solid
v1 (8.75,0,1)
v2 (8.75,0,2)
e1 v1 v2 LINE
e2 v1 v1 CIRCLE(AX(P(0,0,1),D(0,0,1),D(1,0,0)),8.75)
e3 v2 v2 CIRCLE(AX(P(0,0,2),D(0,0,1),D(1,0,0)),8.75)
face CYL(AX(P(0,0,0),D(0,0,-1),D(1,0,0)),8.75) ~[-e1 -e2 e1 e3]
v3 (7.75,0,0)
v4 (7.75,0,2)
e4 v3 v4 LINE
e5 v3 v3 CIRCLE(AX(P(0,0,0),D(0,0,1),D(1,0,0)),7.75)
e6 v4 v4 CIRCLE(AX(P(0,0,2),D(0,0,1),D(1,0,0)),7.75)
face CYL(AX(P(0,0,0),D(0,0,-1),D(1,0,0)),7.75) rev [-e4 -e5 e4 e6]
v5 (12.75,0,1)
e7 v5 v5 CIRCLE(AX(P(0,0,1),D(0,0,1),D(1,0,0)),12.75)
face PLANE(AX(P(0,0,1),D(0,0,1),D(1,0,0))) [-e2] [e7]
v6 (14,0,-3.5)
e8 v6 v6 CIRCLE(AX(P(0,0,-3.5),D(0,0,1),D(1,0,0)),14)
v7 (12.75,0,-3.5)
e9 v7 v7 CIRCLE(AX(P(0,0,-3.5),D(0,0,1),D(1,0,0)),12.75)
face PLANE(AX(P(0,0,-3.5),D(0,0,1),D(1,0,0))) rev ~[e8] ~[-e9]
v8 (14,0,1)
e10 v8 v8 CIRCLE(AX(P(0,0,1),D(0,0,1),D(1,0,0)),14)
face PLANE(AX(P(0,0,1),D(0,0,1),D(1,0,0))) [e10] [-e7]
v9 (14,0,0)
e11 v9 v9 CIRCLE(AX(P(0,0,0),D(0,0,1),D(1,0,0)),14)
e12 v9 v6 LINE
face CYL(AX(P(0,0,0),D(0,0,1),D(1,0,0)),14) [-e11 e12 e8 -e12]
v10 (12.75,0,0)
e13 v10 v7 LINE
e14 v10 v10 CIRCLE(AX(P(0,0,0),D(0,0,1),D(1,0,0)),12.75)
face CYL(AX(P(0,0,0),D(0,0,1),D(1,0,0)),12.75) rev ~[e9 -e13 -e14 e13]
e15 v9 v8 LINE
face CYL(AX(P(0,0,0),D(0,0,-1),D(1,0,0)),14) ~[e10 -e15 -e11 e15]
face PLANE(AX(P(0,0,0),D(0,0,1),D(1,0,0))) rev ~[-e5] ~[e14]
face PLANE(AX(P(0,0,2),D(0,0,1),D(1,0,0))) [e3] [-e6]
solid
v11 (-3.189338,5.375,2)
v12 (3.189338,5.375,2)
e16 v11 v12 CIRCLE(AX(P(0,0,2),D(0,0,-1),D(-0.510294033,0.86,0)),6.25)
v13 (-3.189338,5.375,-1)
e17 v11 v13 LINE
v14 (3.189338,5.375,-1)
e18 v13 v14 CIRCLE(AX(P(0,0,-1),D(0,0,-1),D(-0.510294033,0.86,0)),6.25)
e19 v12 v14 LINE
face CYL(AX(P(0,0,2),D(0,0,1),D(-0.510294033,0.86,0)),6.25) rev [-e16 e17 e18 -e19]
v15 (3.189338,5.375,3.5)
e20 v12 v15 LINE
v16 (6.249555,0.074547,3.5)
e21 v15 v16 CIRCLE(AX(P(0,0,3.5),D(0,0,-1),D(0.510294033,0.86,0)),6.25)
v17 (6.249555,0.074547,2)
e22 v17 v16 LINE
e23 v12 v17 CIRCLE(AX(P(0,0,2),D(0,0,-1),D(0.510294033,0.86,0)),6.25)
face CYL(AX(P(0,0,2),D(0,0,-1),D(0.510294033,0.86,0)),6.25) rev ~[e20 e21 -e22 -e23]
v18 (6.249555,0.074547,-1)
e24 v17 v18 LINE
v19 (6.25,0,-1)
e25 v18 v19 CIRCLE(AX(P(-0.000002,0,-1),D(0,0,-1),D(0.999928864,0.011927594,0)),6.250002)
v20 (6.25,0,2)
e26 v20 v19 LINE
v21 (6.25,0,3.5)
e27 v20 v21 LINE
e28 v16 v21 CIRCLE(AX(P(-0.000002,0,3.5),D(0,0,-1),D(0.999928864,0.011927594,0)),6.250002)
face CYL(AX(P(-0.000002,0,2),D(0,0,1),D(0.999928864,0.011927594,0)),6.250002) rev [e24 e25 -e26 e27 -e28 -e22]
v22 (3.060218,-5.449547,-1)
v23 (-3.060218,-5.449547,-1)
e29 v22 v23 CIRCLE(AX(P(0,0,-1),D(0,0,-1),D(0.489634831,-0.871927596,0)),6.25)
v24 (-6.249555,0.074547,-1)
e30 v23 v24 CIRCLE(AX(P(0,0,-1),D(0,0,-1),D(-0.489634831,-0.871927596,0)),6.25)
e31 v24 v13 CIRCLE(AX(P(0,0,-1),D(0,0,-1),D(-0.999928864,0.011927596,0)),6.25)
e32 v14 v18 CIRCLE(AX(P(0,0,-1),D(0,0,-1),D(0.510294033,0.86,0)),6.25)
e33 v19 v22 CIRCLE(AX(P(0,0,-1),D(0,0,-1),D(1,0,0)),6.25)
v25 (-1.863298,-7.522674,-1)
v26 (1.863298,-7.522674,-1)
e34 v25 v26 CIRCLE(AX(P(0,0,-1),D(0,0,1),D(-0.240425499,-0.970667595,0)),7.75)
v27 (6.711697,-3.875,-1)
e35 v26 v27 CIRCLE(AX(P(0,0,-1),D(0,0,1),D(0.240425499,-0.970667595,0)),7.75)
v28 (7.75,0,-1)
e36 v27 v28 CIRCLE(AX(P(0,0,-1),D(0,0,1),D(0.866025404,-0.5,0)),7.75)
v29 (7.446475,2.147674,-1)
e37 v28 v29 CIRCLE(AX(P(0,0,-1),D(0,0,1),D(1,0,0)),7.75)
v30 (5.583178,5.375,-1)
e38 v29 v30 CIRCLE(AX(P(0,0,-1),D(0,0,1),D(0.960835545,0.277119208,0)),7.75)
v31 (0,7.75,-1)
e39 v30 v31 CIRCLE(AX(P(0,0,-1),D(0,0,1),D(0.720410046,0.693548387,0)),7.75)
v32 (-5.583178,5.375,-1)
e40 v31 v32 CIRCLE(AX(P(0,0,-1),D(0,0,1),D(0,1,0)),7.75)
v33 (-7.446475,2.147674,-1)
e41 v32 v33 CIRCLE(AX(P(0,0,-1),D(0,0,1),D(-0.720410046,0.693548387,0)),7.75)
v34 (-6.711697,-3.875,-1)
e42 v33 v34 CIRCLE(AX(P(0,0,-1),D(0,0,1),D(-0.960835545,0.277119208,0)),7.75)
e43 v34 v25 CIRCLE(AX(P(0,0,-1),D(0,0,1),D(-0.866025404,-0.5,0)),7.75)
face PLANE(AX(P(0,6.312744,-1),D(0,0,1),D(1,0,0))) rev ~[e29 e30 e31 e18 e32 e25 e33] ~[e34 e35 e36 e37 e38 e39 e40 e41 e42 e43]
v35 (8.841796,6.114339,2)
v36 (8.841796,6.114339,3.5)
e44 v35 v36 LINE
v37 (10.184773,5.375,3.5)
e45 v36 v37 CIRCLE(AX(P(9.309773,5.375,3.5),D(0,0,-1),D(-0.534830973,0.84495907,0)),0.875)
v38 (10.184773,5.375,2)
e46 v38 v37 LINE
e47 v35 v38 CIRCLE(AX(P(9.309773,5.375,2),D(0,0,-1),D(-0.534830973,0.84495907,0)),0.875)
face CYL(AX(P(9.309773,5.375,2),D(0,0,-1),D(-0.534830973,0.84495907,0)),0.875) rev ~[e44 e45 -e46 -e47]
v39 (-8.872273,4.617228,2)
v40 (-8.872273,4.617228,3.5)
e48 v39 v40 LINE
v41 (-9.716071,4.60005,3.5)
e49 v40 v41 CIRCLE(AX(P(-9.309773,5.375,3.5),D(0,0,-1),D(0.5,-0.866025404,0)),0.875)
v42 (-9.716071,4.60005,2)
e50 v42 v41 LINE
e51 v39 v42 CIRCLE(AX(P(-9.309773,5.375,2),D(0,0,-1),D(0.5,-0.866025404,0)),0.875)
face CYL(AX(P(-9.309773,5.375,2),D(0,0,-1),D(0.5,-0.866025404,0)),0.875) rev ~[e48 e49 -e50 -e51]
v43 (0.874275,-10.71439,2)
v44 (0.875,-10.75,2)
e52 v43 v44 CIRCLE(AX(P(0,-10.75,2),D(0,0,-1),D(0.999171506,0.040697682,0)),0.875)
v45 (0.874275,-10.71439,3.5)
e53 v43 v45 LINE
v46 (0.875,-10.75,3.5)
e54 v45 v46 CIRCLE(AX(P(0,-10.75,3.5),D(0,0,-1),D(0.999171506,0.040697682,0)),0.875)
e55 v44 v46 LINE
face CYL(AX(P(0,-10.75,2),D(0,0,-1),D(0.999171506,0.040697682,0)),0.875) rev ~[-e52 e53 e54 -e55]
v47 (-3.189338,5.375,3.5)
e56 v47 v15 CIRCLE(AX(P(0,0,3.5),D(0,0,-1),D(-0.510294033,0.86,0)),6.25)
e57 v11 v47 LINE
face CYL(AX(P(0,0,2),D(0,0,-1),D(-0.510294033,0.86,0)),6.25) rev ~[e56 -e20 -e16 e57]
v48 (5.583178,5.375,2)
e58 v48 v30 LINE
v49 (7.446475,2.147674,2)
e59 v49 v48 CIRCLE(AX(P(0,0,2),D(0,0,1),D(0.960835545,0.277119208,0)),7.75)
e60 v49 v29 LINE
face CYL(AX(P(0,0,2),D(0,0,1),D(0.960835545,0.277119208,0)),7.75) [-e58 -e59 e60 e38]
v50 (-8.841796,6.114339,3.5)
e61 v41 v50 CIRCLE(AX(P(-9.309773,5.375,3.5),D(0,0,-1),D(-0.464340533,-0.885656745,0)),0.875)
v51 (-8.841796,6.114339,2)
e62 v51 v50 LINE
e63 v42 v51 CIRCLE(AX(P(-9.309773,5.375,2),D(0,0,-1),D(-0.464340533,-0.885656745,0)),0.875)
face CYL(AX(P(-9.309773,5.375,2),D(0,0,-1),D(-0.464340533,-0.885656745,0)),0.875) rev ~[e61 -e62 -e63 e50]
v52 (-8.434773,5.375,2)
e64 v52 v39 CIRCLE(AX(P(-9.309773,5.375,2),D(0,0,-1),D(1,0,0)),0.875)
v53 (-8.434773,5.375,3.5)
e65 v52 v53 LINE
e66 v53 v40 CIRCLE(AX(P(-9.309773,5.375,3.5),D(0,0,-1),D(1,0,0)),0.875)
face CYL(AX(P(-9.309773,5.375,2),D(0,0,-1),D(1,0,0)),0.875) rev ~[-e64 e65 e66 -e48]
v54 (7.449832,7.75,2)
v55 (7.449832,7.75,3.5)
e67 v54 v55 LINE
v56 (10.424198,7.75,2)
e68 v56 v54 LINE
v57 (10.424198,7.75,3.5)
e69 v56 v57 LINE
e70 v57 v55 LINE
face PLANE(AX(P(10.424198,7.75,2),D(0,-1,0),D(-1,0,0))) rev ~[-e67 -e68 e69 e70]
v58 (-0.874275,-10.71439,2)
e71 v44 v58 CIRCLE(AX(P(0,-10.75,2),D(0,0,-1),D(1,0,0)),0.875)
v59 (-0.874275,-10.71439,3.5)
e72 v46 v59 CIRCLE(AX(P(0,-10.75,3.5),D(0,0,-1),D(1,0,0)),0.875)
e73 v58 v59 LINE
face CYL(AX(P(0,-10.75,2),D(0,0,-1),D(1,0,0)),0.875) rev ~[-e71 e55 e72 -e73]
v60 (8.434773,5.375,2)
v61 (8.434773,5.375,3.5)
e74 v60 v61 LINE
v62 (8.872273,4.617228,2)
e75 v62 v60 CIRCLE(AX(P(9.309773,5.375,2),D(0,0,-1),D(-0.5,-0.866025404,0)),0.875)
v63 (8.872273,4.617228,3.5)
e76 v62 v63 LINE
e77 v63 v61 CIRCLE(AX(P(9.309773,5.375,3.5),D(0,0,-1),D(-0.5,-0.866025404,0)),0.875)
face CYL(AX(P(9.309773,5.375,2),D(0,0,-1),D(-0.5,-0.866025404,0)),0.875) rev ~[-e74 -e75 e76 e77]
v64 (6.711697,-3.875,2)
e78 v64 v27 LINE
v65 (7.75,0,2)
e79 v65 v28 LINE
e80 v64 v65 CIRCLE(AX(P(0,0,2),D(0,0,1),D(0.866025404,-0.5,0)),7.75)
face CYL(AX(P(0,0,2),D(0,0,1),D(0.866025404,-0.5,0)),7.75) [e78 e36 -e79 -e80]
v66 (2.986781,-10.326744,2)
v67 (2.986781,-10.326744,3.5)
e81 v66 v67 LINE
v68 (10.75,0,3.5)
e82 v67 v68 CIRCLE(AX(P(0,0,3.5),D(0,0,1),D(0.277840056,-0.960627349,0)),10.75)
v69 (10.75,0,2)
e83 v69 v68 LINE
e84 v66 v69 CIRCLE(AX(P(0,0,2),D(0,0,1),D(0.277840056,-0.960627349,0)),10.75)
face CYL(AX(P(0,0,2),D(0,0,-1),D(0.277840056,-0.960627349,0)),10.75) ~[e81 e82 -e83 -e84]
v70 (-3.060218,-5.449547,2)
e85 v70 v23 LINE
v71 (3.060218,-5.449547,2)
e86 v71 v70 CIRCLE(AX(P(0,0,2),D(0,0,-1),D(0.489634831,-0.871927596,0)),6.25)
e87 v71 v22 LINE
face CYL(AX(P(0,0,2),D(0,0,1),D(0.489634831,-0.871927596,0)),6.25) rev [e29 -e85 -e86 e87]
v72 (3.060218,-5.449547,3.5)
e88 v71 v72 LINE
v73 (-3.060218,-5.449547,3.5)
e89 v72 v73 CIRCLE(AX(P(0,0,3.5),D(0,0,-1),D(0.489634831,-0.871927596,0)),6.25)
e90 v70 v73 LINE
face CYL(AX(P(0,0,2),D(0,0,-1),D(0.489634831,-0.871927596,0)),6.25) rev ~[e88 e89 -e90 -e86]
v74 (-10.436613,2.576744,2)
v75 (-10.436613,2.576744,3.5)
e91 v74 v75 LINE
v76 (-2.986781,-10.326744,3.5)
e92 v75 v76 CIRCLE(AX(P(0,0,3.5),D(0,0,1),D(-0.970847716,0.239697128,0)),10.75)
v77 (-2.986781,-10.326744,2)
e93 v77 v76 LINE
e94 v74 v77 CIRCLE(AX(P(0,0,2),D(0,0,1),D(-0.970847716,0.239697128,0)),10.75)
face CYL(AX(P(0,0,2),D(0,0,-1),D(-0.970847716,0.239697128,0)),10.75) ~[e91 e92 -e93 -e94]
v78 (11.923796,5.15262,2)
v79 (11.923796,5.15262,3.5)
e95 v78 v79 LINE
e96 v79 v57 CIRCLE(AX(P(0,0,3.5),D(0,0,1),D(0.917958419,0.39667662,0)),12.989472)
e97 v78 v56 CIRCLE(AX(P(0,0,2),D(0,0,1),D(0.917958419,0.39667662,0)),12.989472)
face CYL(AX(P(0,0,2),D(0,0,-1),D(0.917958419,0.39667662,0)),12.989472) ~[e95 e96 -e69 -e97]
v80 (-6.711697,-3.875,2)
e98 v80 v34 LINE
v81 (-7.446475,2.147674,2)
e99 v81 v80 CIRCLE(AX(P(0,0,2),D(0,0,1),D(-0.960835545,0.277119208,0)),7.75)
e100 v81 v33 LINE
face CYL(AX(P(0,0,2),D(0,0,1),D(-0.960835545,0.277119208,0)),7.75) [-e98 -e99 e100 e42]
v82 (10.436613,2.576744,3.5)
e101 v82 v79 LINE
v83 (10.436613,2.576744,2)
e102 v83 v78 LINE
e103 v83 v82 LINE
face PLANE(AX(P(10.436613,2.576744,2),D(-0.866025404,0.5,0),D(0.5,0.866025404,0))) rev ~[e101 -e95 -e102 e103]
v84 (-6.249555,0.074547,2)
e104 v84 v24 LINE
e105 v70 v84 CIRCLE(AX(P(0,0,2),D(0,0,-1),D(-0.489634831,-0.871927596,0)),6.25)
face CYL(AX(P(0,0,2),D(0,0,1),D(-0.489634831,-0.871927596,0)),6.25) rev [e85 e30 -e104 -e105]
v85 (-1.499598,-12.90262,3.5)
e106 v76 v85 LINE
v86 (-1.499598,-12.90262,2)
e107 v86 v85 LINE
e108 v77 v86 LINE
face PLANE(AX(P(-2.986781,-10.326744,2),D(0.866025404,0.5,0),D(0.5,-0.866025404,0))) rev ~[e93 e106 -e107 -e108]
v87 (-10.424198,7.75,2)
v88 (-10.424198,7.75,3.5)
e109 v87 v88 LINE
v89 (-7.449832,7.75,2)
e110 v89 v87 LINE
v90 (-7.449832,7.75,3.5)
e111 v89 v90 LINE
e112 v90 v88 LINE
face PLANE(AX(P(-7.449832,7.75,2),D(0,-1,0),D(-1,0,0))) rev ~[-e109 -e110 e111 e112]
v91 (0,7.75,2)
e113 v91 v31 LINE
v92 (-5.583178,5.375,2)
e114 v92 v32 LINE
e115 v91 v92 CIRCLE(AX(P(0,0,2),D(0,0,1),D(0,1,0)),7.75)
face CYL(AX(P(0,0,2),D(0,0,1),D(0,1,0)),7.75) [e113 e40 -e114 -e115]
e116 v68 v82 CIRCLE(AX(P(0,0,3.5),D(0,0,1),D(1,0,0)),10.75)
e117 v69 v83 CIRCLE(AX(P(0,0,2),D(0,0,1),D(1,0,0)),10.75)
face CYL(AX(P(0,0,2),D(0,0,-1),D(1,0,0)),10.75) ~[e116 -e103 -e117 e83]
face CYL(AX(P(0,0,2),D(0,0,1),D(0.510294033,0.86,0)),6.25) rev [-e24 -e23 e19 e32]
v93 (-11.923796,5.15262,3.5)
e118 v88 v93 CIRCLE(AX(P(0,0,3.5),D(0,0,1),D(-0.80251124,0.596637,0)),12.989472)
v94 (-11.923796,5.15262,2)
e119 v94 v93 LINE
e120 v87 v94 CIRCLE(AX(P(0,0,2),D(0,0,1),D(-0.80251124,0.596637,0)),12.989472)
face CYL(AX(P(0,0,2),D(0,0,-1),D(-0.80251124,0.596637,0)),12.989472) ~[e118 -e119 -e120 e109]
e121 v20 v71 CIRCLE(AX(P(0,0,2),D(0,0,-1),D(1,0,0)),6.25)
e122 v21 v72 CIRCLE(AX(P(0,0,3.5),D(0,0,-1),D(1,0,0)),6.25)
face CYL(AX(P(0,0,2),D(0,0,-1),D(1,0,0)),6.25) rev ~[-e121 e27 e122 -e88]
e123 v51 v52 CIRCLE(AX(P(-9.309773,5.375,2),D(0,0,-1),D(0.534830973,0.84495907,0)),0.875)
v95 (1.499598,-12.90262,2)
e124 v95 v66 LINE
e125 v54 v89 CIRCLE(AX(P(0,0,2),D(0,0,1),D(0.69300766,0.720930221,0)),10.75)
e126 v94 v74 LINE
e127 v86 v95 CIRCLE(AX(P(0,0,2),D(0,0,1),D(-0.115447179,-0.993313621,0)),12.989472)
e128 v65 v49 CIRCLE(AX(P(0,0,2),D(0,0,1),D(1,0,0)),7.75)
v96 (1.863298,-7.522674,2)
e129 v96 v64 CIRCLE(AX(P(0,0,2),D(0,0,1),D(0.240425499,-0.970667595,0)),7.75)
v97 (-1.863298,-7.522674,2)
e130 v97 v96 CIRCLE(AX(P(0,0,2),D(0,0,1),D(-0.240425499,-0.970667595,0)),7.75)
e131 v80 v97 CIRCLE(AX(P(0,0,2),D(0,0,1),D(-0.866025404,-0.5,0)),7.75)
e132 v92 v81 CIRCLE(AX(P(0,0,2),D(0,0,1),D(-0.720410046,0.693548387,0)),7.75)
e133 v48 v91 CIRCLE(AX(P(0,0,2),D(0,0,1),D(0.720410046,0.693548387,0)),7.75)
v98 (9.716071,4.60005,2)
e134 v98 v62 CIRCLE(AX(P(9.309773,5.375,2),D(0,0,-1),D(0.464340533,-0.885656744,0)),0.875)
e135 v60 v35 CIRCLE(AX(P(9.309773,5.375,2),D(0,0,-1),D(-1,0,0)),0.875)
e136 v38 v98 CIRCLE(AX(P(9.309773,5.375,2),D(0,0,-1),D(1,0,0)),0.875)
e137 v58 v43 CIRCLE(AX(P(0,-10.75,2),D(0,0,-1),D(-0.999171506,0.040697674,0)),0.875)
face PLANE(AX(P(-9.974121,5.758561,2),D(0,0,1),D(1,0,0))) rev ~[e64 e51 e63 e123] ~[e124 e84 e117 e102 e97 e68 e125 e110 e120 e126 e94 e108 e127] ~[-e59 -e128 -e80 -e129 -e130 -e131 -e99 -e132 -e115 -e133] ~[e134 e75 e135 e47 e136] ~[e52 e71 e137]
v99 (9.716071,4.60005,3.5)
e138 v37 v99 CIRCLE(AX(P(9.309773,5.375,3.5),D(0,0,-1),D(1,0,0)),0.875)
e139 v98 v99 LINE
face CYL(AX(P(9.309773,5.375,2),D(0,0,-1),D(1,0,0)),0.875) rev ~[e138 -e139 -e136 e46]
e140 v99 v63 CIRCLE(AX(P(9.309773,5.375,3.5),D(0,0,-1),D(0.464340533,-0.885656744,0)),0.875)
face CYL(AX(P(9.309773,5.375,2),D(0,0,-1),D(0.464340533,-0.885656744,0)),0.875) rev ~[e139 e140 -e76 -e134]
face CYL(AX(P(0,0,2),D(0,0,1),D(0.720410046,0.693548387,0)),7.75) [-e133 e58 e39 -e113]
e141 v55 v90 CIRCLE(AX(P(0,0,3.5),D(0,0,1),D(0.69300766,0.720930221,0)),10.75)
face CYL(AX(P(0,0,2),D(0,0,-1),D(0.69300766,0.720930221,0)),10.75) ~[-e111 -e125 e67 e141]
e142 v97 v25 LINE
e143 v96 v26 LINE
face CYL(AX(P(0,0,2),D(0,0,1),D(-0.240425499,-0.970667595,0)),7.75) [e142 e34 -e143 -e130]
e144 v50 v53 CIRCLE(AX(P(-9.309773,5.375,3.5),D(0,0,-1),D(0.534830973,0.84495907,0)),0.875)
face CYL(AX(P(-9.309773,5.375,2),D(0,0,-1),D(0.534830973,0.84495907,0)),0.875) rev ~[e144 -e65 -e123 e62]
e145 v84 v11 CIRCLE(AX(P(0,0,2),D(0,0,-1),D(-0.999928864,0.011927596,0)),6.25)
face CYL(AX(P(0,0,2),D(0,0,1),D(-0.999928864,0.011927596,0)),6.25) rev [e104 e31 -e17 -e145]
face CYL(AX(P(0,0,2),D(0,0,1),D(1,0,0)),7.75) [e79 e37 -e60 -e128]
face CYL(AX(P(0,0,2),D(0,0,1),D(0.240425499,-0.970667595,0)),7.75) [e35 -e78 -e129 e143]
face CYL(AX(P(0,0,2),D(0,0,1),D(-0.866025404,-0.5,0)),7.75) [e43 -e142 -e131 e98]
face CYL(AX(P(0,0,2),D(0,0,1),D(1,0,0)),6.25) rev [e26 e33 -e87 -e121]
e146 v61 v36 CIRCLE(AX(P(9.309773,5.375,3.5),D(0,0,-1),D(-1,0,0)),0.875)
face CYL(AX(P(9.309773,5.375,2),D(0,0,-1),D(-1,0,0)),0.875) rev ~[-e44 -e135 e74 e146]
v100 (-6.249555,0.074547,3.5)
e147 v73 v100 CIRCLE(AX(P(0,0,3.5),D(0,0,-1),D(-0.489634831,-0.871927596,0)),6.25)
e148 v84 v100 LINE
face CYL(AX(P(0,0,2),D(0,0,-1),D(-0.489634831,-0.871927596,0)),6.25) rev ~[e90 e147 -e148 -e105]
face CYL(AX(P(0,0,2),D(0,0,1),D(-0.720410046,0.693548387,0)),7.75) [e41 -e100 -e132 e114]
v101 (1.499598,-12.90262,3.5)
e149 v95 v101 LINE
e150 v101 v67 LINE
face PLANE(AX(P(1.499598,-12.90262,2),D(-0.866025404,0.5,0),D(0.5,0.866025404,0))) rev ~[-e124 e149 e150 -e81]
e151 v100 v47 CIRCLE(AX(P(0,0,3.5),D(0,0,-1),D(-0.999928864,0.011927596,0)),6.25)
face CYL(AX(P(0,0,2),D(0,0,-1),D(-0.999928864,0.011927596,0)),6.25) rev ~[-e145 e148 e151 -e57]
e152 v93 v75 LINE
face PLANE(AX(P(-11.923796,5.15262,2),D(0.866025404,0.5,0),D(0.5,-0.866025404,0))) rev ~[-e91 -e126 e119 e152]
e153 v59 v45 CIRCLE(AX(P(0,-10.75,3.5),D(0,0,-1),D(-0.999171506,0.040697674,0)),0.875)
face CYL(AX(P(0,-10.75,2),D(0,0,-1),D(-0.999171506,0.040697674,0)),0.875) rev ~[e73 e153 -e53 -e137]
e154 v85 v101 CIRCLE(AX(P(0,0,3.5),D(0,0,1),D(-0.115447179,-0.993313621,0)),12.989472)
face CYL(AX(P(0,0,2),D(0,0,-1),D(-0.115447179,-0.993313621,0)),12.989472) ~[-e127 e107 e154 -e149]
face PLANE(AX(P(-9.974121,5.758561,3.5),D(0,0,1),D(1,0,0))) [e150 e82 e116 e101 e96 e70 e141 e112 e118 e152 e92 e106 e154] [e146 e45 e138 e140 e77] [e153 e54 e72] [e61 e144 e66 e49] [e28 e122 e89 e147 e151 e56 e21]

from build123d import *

# Parameters (mm, degrees)
F0_R          = 8.75
F0_R_2        = 7.75
F1_DEPTH      = 2
F0_R_3        = 12.75
F2_DEPTH      = 1
F0_R_4        = 14
F3_DEPTH      = 3.5
F3_DEPTH_BACK = 1
F5_DEPTH      = 1.5
F6_DEPTH      = 3


# Not quite as in the source:
# - ends of sketch curves that miss each other by under 0.0002 mm in the source are joined


with BuildPart() as f1:
    # F0 (on Top) → F1 (new body)
    with BuildSketch(Plane.XY):
        Circle(F0_R)
        Circle(F0_R_2, mode=Mode.SUBTRACT)
    extrude(amount=F1_DEPTH)

    # F0 (on Top) → F2 (join)
    with BuildSketch(Plane.XY):
        Circle(F0_R_3)
        Circle(F0_R, mode=Mode.SUBTRACT)
    extrude(amount=F2_DEPTH)

    # F0 (on Top) → F3 (join, two sides)
    with BuildSketch(Plane.XY) as f3_sk:
        Circle(F0_R_4)
        Circle(F0_R_3, mode=Mode.SUBTRACT)
    extrude(amount=-F3_DEPTH)
    extrude(f3_sk.sketch, amount=F3_DEPTH_BACK)


with BuildPart() as f5:
    # F4 (on face) → F5 (new body)
    with BuildSketch(Plane.XY.offset(2)):
        with BuildLine():
            Line((-7.4498323446, 7.7499998733), (-10.4241976301, 7.7499998733))
            ThreePointArc((-10.4241976301, 7.7499998733), (-11.2492131147, 6.49473622), (-11.9237955847, 5.1526200251))
            Line((-11.9237955847, 5.1526200251), (-10.436612942, 2.5767441277))
            ThreePointArc((-10.436612942, 2.5767441277), (-10.1269990673, 3.606437285), (-9.7160710573, 4.6000503485))
            ThreePointArc((-9.7160710573, 4.6000503485), (-10.067545319, 5.8125), (-8.8417959892, 6.1143391863))
            ThreePointArc((-8.8417959892, 6.1143391863), (-8.1867658396, 6.9670198139), (-7.4498323446, 7.7499998733))
        make_face()
        with BuildLine():
            Line((1.4995979546, -12.9026198984), (2.9867805973, -10.3267440011))
            ThreePointArc((2.9867805973, -10.3267440011), (1.9402332277, -10.5734570989), (0.8742750681, -10.7143895349))
            ThreePointArc((0.8742750681, -10.7143895349), (0.8748187483, -10.7321910784), (0.875, -10.75))
            ThreePointArc((0.875, -10.75), (-0.0178089216, -11.6248187483), (-0.8742750681, -10.7143895349))
            ThreePointArc((-0.8742750681, -10.7143895349), (-1.9402332277, -10.5734570989), (-2.9867805973, -10.3267440011))
            Line((-2.9867805973, -10.3267440011), (-1.4995979546, -12.9026198984))
            ThreePointArc((-1.4995979546, -12.9026198984), (0, -12.9894724399), (1.4995979546, -12.9026198984))
        make_face()
        with BuildLine():
            ThreePointArc((9.7160710573, 4.6000503485), (10.1269990673, 3.606437285), (10.436612942, 2.5767441277))
            Line((10.436612942, 2.5767441277), (11.9237955847, 5.1526200251))
            ThreePointArc((11.9237955847, 5.1526200251), (11.2492131147, 6.49473622), (10.4241976301, 7.7499998733))
            Line((10.4241976301, 7.7499998733), (7.4498323446, 7.7499998733))
            ThreePointArc((7.4498323446, 7.7499998733), (8.1867658396, 6.9670198139), (8.8417959892, 6.1143391863))
            ThreePointArc((8.8417959892, 6.1143391863), (9.7317594863, 6.1415197205), (10.1847730907, 5.375))
            ThreePointArc((10.1847730907, 5.375), (10.0584838896, 4.9221676474), (9.7160710573, 4.6000503485))
        make_face()
        with BuildLine():
            Line((4.062019444, 7.7499998733), (7.4498323446, 7.7499998733))
            ThreePointArc((7.4498323446, 7.7499998733), (0, 10.75), (-7.4498323446, 7.7499998733))
            Line((-7.4498323446, 7.7499998733), (-4.062019444, 7.7499998733))
            ThreePointArc((-4.062019444, 7.7499998733), (0, 8.75), (4.062019444, 7.7499998733))
        make_face()
        with BuildLine():
            Line((-4.062019444, 7.7499998733), (-7.4498323446, 7.7499998733))
            ThreePointArc((-7.4498323446, 7.7499998733), (-8.1867658396, 6.9670198139), (-8.8417959892, 6.1143391863))
            ThreePointArc((-8.8417959892, 6.1143391863), (-8.5432533702, 5.7969863956), (-8.4347730907, 5.375))
            Line((-8.4347730907, 5.375), (-6.9044822398, 5.375))
            ThreePointArc((-6.9044822398, 5.375), (-5.6103650411, 6.7146335794), (-4.062019444, 7.7499998733))
        make_face()
        with BuildLine():
            Line((-6.9044822398, 5.375), (-8.4347730907, 5.375))
            ThreePointArc((-8.4347730907, 5.375), (-8.5520008624, 4.9375), (-8.8722730907, 4.6172277717))
            Line((-8.8722730907, 4.6172277717), (-8.1071276653, 3.2919570197))
            ThreePointArc((-8.1071276653, 3.2919570197), (-7.5777222831, 4.375), (-6.9044822398, 5.375))
        make_face()
        with BuildLine():
            ThreePointArc((-9.7160710573, 4.6000503485), (-10.1269990673, 3.606437285), (-10.436612942, 2.5767441277))
            Line((-10.436612942, 2.5767441277), (-8.7427064916, -0.3571879075))
            ThreePointArc((-8.7427064916, -0.3571879075), (-8.6202257774, 1.5014018604), (-8.1071276653, 3.2919570197))
            Line((-8.1071276653, 3.2919570197), (-8.8722730907, 4.6172277717))
            ThreePointArc((-8.8722730907, 4.6172277717), (-9.2919641691, 4.5001812517), (-9.7160710573, 4.6000503485))
        make_face()
        with BuildLine():
            ThreePointArc((-10.436612942, 2.5767441277), (-9.3097730907, -5.375), (-2.9867805973, -10.3267440011))
            Line((-2.9867805973, -10.3267440011), (-4.6806870477, -7.3928119658))
            ThreePointArc((-4.6806870477, -7.3928119658), (-7.5777222831, -4.375), (-8.7427064916, -0.3571879075))
            Line((-8.7427064916, -0.3571879075), (-10.436612942, 2.5767441277))
        make_face()
        with BuildLine():
            ThreePointArc((-2.9867805973, -10.3267440011), (-1.9402332277, -10.5734570989), (-0.8742750681, -10.7143895349))
            ThreePointArc((-0.8742750681, -10.7143895349), (-0.7487107989, -10.2971676474), (-0.4375, -9.9922277717))
            Line((-0.4375, -9.9922277717), (-1.2026454254, -8.6669570197))
            ThreePointArc((-1.2026454254, -8.6669570197), (-3.0098607363, -8.2160354398), (-4.6806870477, -7.3928119658))
            Line((-4.6806870477, -7.3928119658), (-2.9867805973, -10.3267440011))
        make_face()
        with BuildLine():
            ThreePointArc((0.8742750681, -10.7143895349), (1.9402332277, -10.5734570989), (2.9867805973, -10.3267440011))
            Line((2.9867805973, -10.3267440011), (4.6806870477, -7.3928119658))
            ThreePointArc((4.6806870477, -7.3928119658), (3.0098607363, -8.2160354398), (1.2026454254, -8.6669570197))
            Line((1.2026454254, -8.6669570197), (0.4375, -9.9922277717))
            ThreePointArc((0.4375, -9.9922277717), (0.7487107989, -10.2971676474), (0.8742750681, -10.7143895349))
        make_face()
        with BuildLine():
            ThreePointArc((2.9867805973, -10.3267440011), (8.592740873, -6.4596675061), (10.75, 0))
            ThreePointArc((10.75, 0), (10.6713656372, 1.2978657238), (10.436612942, 2.5767441277))
            Line((10.436612942, 2.5767441277), (8.7427064916, -0.3571879075))
            ThreePointArc((8.7427064916, -0.3571879075), (7.5777222831, -4.375), (4.6806870477, -7.3928119658))
            Line((4.6806870477, -7.3928119658), (2.9867805973, -10.3267440011))
        make_face()
        with BuildLine():
            Line((8.7427064916, -0.3571879075), (10.436612942, 2.5767441277))
            ThreePointArc((10.436612942, 2.5767441277), (10.1269990673, 3.606437285), (9.7160710573, 4.6000503485))
            ThreePointArc((9.7160710573, 4.6000503485), (9.2919641691, 4.5001812517), (8.8722730907, 4.6172277717))
            Line((8.8722730907, 4.6172277717), (8.1071276653, 3.2919570197))
            ThreePointArc((8.1071276653, 3.2919570197), (8.5877781489, 1.6770707989), (8.75, 0))
            ThreePointArc((8.75, 0), (8.7481764329, -0.1786311819), (8.7427064916, -0.3571879075))
        make_face()
        with BuildLine():
            Line((8.1071276653, 3.2919570197), (8.8722730907, 4.6172277717))
            ThreePointArc((8.8722730907, 4.6172277717), (8.5520008624, 4.9375), (8.4347730907, 5.375))
            Line((8.4347730907, 5.375), (6.9044822398, 5.375))
            ThreePointArc((6.9044822398, 5.375), (7.5777222831, 4.375), (8.1071276653, 3.2919570197))
        make_face()
        with BuildLine():
            ThreePointArc((8.4347730907, 5.375), (8.5432533702, 5.7969863956), (8.8417959892, 6.1143391863))
            ThreePointArc((8.8417959892, 6.1143391863), (8.1867658396, 6.9670198139), (7.4498323446, 7.7499998733))
            Line((7.4498323446, 7.7499998733), (4.062019444, 7.7499998733))
            ThreePointArc((4.062019444, 7.7499998733), (5.6103650411, 6.7146335794), (6.9044822398, 5.375))
            Line((6.9044822398, 5.375), (8.4347730907, 5.375))
        make_face()
        with BuildLine():
            ThreePointArc((-0.4375, -9.9922277717), (0, -9.875), (0.4375, -9.9922277717))
            Line((0.4375, -9.9922277717), (1.2026454254, -8.6669570197))
            ThreePointArc((1.2026454254, -8.6669570197), (0, -8.75), (-1.2026454254, -8.6669570197))
            Line((-1.2026454254, -8.6669570197), (-0.4375, -9.9922277717))
        make_face()
        with BuildLine():
            Line((0, 7.7499998733), (4.062019444, 7.7499998733))
            ThreePointArc((4.062019444, 7.7499998733), (0, 8.75), (-4.062019444, 7.7499998733))
            Line((-4.062019444, 7.7499998733), (0, 7.7499998733))
        make_face()
        with BuildLine():
            Line((0, 7.7499998733), (-4.062019444, 7.7499998733))
            ThreePointArc((-4.062019444, 7.7499998733), (-5.6103650411, 6.7146335794), (-6.9044822398, 5.375))
            Line((-6.9044822398, 5.375), (-5.5831778585, 5.375))
            ThreePointArc((-5.5831778585, 5.375), (-3.0336652749, 7.1315759128), (0, 7.7499998733))
        make_face()
        with BuildLine():
            Line((-5.5831778585, 5.375), (-6.9044822398, 5.375))
            ThreePointArc((-6.9044822398, 5.375), (-7.5777222831, 4.375), (-8.1071276653, 3.2919570197))
            Line((-8.1071276653, 3.2919570197), (-7.4464754746, 2.1476738593))
            ThreePointArc((-7.4464754746, 2.1476738593), (-6.7116968793, 3.875), (-5.5831778585, 5.375))
        make_face()
        with BuildLine():
            Line((-8.7427064916, -0.3571879075), (-6.7116967696, -3.8749999367))
            ThreePointArc((-6.7116967696, -3.8749999367), (-7.6929585469, -0.9385567618), (-7.4464754746, 2.1476738593))
            Line((-7.4464754746, 2.1476738593), (-8.1071276653, 3.2919570197))
            ThreePointArc((-8.1071276653, 3.2919570197), (-8.6202257774, 1.5014018604), (-8.7427064916, -0.3571879075))
        make_face()
        with BuildLine():
            ThreePointArc((-8.7427064916, -0.3571879075), (-7.5777222831, -4.375), (-4.6806870477, -7.3928119658))
            Line((-4.6806870477, -7.3928119658), (-6.7116967696, -3.8749999367))
            Line((-6.7116967696, -3.8749999367), (-8.7427064916, -0.3571879075))
        make_face()
        with BuildLine():
            ThreePointArc((-4.6806870477, -7.3928119658), (-3.0098607363, -8.2160354398), (-1.2026454254, -8.6669570197))
            Line((-1.2026454254, -8.6669570197), (-1.8632976161, -7.5226738593))
            ThreePointArc((-1.8632976161, -7.5226738593), (-4.6592932721, -6.193019151), (-6.7116968793, -3.875))
            Line((-6.7116968793, -3.875), (-4.6806870477, -7.3928119658))
        make_face()
        with BuildLine():
            ThreePointArc((-1.2026454254, -8.6669570197), (0, -8.75), (1.2026454254, -8.6669570197))
            Line((1.2026454254, -8.6669570197), (1.8632976161, -7.5226738593))
            ThreePointArc((1.8632976161, -7.5226738593), (0, -7.75), (-1.8632976161, -7.5226738593))
            Line((-1.8632976161, -7.5226738593), (-1.2026454254, -8.6669570197))
        make_face()
        with BuildLine():
            ThreePointArc((1.2026454254, -8.6669570197), (3.0098607363, -8.2160354398), (4.6806870477, -7.3928119658))
            Line((4.6806870477, -7.3928119658), (6.7116967696, -3.8749999367))
            ThreePointArc((6.7116967696, -3.8749999367), (4.6592932721, -6.193019151), (1.8632976161, -7.5226738593))
            Line((1.8632976161, -7.5226738593), (1.2026454254, -8.6669570197))
        make_face()
        with BuildLine():
            ThreePointArc((4.6806870477, -7.3928119658), (7.5777222831, -4.375), (8.7427064916, -0.3571879075))
            Line((8.7427064916, -0.3571879075), (6.7116967696, -3.8749999367))
            Line((6.7116967696, -3.8749999367), (4.6806870477, -7.3928119658))
        make_face()
        with BuildLine():
            Line((6.7116967696, -3.8749999367), (8.7427064916, -0.3571879075))
            ThreePointArc((8.7427064916, -0.3571879075), (8.7481764329, -0.1786311819), (8.75, 0))
            ThreePointArc((8.75, 0), (8.5877781489, 1.6770707989), (8.1071276653, 3.2919570197))
            Line((8.1071276653, 3.2919570197), (7.4464754746, 2.1476738593))
            ThreePointArc((7.4464754746, 2.1476738593), (7.6737437059, 1.0845079695), (7.75, 0))
            ThreePointArc((7.75, 0), (7.4859251537, -2.0058475995), (6.7116967696, -3.8749999367))
        make_face()
        with BuildLine():
            Line((7.4464754746, 2.1476738593), (8.1071276653, 3.2919570197))
            ThreePointArc((8.1071276653, 3.2919570197), (7.5777222831, 4.375), (6.9044822398, 5.375))
            Line((6.9044822398, 5.375), (5.5831778585, 5.375))
            ThreePointArc((5.5831778585, 5.375), (6.7116968793, 3.875), (7.4464754746, 2.1476738593))
        make_face()
        with BuildLine():
            Line((5.5831778585, 5.375), (6.9044822398, 5.375))
            ThreePointArc((6.9044822398, 5.375), (5.6103650411, 6.7146335794), (4.062019444, 7.7499998733))
            Line((4.062019444, 7.7499998733), (0, 7.7499998733))
            ThreePointArc((0, 7.7499998733), (3.0336652749, 7.1315759128), (5.5831778585, 5.375))
        make_face()
        with BuildLine():
            Line((3.1893377055, 5.375), (5.5831778585, 5.375))
            ThreePointArc((5.5831778585, 5.375), (3.0336652749, 7.1315759128), (0, 7.75))
            ThreePointArc((0, 7.75), (-3.0336652749, 7.1315759128), (-5.5831778585, 5.375))
            Line((-5.5831778585, 5.375), (-3.1893377055, 5.375))
            ThreePointArc((-3.1893377055, 5.375), (0, 6.25), (3.1893377055, 5.375))
        make_face()
        with BuildLine():
            Line((-3.1893377055, 5.375), (-5.5831778585, 5.375))
            ThreePointArc((-5.5831778585, 5.375), (-6.7116968793, 3.875), (-7.4464754746, 2.1476738593))
            Line((-7.4464754746, 2.1476738593), (-6.2495553981, 0.0745474742))
            ThreePointArc((-6.2495553981, 0.0745474742), (-5.4126587737, 3.125), (-3.1893377055, 5.375))
        make_face()
        with BuildLine():
            ThreePointArc((-6.7116968793, -3.875), (-4.6592932721, -6.193019151), (-1.8632976161, -7.5226738593))
            Line((-1.8632976161, -7.5226738593), (-3.0602176926, -5.4495474742))
            ThreePointArc((-3.0602176926, -5.4495474742), (-5.4126587737, -3.125), (-6.2495553981, 0.0745474742))
            Line((-6.2495553981, 0.0745474742), (-7.4464754746, 2.1476738593))
            ThreePointArc((-7.4464754746, 2.1476738593), (-7.6929585469, -0.9385567618), (-6.7116968793, -3.875))
        make_face()
        with BuildLine():
            ThreePointArc((1.8632976161, -7.5226738593), (4.6592932721, -6.193019151), (6.7116968793, -3.875))
            ThreePointArc((6.7116968793, -3.875), (7.4859251537, -2.0058475995), (7.75, 0))
            ThreePointArc((7.75, 0), (7.6737437059, 1.0845079695), (7.4464754746, 2.1476738593))
            Line((7.4464754746, 2.1476738593), (6.2495553981, 0.0745474742))
            ThreePointArc((6.2495553981, 0.0745474742), (6.2498888485, 0.0372744), (6.25, 0))
            ThreePointArc((6.25, 0), (5.3939253137, -3.1572250016), (3.0602176926, -5.4495474742))
            Line((3.0602176926, -5.4495474742), (1.8632976161, -7.5226738593))
        make_face()
        with BuildLine():
            Line((6.2495553981, 0.0745474742), (7.4464754746, 2.1476738593))
            ThreePointArc((7.4464754746, 2.1476738593), (6.7116968793, 3.875), (5.5831778585, 5.375))
            Line((5.5831778585, 5.375), (3.1893377055, 5.375))
            ThreePointArc((3.1893377055, 5.375), (5.4126587737, 3.125), (6.2495553981, 0.0745474742))
        make_face()
        with BuildLine():
            ThreePointArc((-1.8632976161, -7.5226738593), (0, -7.75), (1.8632976161, -7.5226738593))
            Line((1.8632976161, -7.5226738593), (3.0602176926, -5.4495474742))
            ThreePointArc((3.0602176926, -5.4495474742), (0, -6.25), (-3.0602176926, -5.4495474742))
            Line((-3.0602176926, -5.4495474742), (-1.8632976161, -7.5226738593))
        make_face()
    extrude(amount=F5_DEPTH)

    # F4 (on face) → F6 (join)
    with BuildSketch(Plane.XY.offset(2)):
        with BuildLine():
            Line((3.1893377055, 5.375), (5.5831778585, 5.375))
            ThreePointArc((5.5831778585, 5.375), (3.0336652749, 7.1315759128), (0, 7.75))
            ThreePointArc((0, 7.75), (-3.0336652749, 7.1315759128), (-5.5831778585, 5.375))
            Line((-5.5831778585, 5.375), (-3.1893377055, 5.375))
            ThreePointArc((-3.1893377055, 5.375), (0, 6.25), (3.1893377055, 5.375))
        make_face()
        with BuildLine():
            Line((-3.1893377055, 5.375), (-5.5831778585, 5.375))
            ThreePointArc((-5.5831778585, 5.375), (-6.7116968793, 3.875), (-7.4464754746, 2.1476738593))
            Line((-7.4464754746, 2.1476738593), (-6.2495553981, 0.0745474742))
            ThreePointArc((-6.2495553981, 0.0745474742), (-5.4126587737, 3.125), (-3.1893377055, 5.375))
        make_face()
        with BuildLine():
            ThreePointArc((-6.7116968793, -3.875), (-4.6592932721, -6.193019151), (-1.8632976161, -7.5226738593))
            Line((-1.8632976161, -7.5226738593), (-3.0602176926, -5.4495474742))
            ThreePointArc((-3.0602176926, -5.4495474742), (-5.4126587737, -3.125), (-6.2495553981, 0.0745474742))
            Line((-6.2495553981, 0.0745474742), (-7.4464754746, 2.1476738593))
            ThreePointArc((-7.4464754746, 2.1476738593), (-7.6929585469, -0.9385567618), (-6.7116968793, -3.875))
        make_face()
        with BuildLine():
            ThreePointArc((-1.8632976161, -7.5226738593), (0, -7.75), (1.8632976161, -7.5226738593))
            Line((1.8632976161, -7.5226738593), (3.0602176926, -5.4495474742))
            ThreePointArc((3.0602176926, -5.4495474742), (0, -6.25), (-3.0602176926, -5.4495474742))
            Line((-3.0602176926, -5.4495474742), (-1.8632976161, -7.5226738593))
        make_face()
        with BuildLine():
            ThreePointArc((1.8632976161, -7.5226738593), (4.6592932721, -6.193019151), (6.7116968793, -3.875))
            ThreePointArc((6.7116968793, -3.875), (7.4859251537, -2.0058475995), (7.75, 0))
            ThreePointArc((7.75, 0), (7.6737437059, 1.0845079695), (7.4464754746, 2.1476738593))
            Line((7.4464754746, 2.1476738593), (6.2495553981, 0.0745474742))
            ThreePointArc((6.2495553981, 0.0745474742), (6.2498888485, 0.0372744), (6.25, 0))
            ThreePointArc((6.25, 0), (5.3939253137, -3.1572250016), (3.0602176926, -5.4495474742))
            Line((3.0602176926, -5.4495474742), (1.8632976161, -7.5226738593))
        make_face()
        with BuildLine():
            Line((6.2495553981, 0.0745474742), (7.4464754746, 2.1476738593))
            ThreePointArc((7.4464754746, 2.1476738593), (6.7116968793, 3.875), (5.5831778585, 5.375))
            Line((5.5831778585, 5.375), (3.1893377055, 5.375))
            ThreePointArc((3.1893377055, 5.375), (5.4126587737, 3.125), (6.2495553981, 0.0745474742))
        make_face()
    extrude(amount=-F6_DEPTH)


solid = Compound([f1.part, f5.part])
